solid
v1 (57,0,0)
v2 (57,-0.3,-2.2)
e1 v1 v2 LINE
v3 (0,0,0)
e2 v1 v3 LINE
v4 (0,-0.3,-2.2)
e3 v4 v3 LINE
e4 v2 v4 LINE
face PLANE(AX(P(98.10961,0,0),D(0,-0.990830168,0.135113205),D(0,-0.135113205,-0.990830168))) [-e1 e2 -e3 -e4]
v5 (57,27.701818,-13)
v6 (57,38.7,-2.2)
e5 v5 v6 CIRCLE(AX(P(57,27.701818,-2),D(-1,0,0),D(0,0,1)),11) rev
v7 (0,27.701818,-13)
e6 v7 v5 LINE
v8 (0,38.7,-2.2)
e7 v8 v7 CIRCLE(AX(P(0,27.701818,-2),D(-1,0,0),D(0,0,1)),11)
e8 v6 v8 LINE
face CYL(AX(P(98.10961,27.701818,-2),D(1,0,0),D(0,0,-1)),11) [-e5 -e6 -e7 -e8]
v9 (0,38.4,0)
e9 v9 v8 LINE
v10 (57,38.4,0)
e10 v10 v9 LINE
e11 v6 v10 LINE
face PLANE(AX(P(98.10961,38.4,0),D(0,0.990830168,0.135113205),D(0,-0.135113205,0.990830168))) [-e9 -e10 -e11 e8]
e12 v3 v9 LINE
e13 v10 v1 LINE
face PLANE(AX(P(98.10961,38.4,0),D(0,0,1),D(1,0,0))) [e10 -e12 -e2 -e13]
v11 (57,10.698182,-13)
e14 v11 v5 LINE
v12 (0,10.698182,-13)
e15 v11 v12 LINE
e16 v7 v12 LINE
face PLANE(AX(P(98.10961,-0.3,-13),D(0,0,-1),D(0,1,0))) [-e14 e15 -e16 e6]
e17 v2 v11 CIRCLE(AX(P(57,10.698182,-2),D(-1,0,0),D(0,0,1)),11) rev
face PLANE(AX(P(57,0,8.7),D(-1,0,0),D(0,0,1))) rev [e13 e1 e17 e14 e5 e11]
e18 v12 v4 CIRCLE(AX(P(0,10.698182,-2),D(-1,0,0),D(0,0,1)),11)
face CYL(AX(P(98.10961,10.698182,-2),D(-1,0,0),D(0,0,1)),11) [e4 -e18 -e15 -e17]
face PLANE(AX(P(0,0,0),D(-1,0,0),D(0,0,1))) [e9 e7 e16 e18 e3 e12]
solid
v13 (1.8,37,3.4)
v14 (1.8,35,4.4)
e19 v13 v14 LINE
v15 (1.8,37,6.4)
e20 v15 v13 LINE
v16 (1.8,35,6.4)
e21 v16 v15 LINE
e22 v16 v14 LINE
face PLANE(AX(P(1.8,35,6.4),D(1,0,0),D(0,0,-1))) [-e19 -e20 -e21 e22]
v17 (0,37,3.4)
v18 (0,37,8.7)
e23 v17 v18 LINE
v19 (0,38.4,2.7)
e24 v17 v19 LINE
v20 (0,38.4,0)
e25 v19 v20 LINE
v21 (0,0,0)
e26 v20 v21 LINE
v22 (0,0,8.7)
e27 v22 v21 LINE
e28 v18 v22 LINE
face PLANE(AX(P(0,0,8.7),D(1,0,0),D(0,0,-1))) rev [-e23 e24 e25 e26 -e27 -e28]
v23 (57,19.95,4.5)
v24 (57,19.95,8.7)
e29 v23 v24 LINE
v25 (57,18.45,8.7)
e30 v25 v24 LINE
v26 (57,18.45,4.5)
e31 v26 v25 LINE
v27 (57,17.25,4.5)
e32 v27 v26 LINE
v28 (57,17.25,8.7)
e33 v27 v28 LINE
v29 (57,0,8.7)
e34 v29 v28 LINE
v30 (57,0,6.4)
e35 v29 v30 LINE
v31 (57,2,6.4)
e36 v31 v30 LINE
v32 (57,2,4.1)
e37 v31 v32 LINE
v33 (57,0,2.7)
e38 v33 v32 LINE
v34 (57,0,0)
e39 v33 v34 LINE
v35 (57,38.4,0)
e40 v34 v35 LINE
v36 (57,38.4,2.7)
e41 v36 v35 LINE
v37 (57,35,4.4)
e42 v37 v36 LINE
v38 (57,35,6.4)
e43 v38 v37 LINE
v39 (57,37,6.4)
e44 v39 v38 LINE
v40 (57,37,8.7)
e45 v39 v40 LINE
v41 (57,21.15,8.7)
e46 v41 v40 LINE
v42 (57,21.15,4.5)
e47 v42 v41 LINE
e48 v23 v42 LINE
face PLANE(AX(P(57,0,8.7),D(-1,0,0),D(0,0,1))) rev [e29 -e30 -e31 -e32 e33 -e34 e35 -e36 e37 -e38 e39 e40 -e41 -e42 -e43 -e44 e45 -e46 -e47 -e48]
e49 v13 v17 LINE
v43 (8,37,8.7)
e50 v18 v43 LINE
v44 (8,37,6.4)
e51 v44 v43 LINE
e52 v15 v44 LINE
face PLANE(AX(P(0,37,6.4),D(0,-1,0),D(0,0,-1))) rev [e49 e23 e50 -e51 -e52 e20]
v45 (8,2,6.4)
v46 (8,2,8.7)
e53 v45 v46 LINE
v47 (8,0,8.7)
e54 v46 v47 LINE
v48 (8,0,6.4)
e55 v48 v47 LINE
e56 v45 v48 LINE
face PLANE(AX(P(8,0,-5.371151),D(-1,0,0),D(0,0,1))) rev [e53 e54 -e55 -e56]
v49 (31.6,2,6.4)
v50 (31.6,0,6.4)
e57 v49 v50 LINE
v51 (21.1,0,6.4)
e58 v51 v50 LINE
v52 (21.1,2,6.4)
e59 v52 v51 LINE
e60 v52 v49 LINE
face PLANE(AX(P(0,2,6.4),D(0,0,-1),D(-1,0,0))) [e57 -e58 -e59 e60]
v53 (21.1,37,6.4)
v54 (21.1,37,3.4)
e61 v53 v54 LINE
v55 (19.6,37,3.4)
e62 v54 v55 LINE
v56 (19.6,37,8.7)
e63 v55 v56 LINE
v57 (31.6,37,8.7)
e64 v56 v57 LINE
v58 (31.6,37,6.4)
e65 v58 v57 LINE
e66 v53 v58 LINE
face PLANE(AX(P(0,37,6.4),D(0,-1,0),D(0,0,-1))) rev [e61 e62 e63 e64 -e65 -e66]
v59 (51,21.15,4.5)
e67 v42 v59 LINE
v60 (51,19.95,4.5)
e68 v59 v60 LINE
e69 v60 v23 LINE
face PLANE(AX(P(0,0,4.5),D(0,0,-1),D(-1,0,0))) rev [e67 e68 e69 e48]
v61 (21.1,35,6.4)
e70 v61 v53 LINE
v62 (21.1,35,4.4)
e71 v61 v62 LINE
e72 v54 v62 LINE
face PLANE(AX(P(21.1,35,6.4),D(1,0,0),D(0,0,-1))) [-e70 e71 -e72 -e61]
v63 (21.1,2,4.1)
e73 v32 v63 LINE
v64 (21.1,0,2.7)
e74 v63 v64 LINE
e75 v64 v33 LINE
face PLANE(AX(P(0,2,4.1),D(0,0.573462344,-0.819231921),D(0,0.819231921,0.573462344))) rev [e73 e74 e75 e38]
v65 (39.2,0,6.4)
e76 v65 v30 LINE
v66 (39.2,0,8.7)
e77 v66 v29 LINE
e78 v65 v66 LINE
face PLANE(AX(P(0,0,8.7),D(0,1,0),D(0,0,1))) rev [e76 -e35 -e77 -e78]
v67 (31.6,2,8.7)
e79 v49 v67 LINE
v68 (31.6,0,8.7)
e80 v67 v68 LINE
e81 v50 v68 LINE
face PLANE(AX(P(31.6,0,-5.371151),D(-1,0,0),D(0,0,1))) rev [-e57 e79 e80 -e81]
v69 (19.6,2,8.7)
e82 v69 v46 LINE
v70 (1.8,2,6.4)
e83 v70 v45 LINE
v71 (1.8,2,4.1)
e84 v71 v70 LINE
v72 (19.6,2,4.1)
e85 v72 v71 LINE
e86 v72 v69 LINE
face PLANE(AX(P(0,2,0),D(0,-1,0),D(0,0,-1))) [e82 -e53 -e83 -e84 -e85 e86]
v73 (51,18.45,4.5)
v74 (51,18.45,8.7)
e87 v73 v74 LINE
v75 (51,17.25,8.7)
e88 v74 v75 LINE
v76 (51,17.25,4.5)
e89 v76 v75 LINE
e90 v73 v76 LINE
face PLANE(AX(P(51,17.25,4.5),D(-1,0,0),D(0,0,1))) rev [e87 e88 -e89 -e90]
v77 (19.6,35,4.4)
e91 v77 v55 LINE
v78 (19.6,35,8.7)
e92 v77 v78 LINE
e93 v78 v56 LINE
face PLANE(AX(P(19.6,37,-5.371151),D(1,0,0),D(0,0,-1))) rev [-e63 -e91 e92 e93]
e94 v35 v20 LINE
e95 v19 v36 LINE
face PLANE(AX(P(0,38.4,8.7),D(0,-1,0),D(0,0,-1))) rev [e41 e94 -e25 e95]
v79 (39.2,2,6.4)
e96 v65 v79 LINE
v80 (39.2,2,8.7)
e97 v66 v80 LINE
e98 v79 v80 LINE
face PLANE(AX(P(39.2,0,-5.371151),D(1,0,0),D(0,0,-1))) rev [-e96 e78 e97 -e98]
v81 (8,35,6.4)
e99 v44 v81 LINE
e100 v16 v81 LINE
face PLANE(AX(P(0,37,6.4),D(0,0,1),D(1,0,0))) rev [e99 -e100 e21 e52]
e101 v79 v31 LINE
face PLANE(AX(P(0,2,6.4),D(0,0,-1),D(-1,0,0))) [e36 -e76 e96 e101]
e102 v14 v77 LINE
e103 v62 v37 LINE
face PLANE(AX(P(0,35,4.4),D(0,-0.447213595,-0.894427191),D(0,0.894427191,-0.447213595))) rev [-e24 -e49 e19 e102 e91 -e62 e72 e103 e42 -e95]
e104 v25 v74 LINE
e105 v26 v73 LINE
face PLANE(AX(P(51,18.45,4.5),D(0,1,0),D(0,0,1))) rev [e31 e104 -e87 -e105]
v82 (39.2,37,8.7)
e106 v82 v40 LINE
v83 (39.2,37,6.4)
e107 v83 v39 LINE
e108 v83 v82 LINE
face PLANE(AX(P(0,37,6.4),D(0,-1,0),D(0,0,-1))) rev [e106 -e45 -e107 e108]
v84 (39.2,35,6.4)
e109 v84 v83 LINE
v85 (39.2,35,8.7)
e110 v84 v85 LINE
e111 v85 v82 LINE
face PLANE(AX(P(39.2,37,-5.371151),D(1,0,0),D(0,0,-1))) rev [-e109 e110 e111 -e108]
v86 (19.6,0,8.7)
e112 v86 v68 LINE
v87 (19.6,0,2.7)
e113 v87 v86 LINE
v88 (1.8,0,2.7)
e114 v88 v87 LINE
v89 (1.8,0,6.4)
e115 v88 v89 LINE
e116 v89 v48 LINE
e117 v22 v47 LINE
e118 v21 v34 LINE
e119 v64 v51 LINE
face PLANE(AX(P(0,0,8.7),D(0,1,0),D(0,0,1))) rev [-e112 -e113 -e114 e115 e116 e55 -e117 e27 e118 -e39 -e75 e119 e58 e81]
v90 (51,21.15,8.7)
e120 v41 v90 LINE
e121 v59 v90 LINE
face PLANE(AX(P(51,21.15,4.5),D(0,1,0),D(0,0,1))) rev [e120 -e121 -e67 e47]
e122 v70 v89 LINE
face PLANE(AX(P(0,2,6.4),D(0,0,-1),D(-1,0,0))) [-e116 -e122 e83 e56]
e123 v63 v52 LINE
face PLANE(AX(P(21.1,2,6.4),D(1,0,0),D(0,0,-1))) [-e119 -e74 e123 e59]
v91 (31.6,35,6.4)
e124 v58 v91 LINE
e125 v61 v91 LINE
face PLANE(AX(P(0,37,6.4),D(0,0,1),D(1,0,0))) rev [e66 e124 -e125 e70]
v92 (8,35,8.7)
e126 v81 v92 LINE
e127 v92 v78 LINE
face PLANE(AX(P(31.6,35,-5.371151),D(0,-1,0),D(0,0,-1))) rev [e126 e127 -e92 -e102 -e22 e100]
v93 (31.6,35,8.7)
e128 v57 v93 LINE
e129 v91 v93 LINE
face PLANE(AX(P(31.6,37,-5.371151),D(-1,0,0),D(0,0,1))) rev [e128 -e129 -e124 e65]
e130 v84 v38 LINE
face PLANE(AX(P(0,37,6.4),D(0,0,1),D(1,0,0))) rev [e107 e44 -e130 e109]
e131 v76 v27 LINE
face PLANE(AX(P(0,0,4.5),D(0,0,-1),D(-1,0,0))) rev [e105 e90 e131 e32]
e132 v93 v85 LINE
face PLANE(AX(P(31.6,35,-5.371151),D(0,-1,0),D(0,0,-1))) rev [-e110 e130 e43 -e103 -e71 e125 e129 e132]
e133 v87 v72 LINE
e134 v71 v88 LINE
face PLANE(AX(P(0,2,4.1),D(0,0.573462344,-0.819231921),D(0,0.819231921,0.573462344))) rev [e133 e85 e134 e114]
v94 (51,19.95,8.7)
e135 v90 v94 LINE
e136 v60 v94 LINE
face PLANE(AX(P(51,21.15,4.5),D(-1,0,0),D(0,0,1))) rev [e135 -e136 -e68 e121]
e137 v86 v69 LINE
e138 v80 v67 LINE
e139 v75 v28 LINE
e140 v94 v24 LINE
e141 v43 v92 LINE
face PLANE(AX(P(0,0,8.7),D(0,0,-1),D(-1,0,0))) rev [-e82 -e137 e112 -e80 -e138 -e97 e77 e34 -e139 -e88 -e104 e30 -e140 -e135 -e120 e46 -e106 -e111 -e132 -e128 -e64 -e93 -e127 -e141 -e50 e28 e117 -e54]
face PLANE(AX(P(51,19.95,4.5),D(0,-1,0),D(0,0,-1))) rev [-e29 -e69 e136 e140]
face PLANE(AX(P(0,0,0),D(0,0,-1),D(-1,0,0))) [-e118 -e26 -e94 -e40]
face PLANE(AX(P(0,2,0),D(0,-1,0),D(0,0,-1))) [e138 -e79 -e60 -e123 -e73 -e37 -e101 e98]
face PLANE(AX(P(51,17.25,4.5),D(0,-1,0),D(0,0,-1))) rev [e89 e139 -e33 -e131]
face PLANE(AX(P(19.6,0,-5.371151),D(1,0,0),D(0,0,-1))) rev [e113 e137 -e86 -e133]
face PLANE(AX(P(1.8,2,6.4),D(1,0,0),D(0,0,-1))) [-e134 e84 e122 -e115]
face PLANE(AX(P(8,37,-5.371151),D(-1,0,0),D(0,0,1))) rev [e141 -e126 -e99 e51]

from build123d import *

# Parameters (mm, degrees)
SKETCH_1_W          = 57
SKETCH_1_H          = 38.4
EXTRUDE_1_DEPTH     = 8.7
SKETCH_2_W          = 57
SKETCH_2_H          = 1.4
CUT_EXTRUDE_1_DEPTH = 2.3
SKETCH_3_W          = 57
SKETCH_3_H          = 2.3
CUT_EXTRUDE_2_DEPTH = 2
SKETCH_4_W          = 11.6
SKETCH_4_H          = 2
SKETCH_4_W_2        = 7.6
CUT_EXTRUDE_3_DEPTH = 2.3
CUT_EXTRUDE_4_DEPTH = 70.276619433
SKETCH_6_W          = 1.5
SKETCH_6_H          = 3.7
SKETCH_6_W_2        = 1.8
EXTRUDE_2_DEPTH     = 2
SKETCH_7_W          = 1.8
SKETCH_7_H          = 3.7
SKETCH_7_W_2        = 1.5
EXTRUDE_3_DEPTH     = 2
SKETCH_10_W         = 6
SKETCH_10_H         = 1.2
CUT_EXTRUDE_5_DEPTH = 4.2
EXTRUDE_4_DEPTH     = 57
FILLET_1_R          = 11


with BuildPart() as part:
    # Эскиз1 → Бобышка-Вытянуть1 (new body)
    with BuildSketch(Plane.XY):
        with Locations((28.5, 19.2)):
            Rectangle(SKETCH_1_W, SKETCH_1_H)
    extrude(amount=EXTRUDE_1_DEPTH)

    # Эскиз2 → Вырез-Вытянуть1 (cut)
    with BuildSketch(Plane.XY.offset(8.7)):
        with Locations((28.5, 37.7)):
            Rectangle(SKETCH_2_W, SKETCH_2_H)
    extrude(amount=-CUT_EXTRUDE_1_DEPTH, mode=Mode.SUBTRACT)

    # Эскиз3 → Вырез-Вытянуть2 (cut)
    with BuildSketch(Plane(origin=(0, 0, 0), x_dir=(1, 0, 0), z_dir=(0, 1, 0))):
        with Locations((28.5, -5.25)):
            Rectangle(SKETCH_3_W, SKETCH_3_H)
    extrude(amount=CUT_EXTRUDE_2_DEPTH, mode=Mode.SUBTRACT)

    # Эскиз4 → Вырез-Вытянуть3 (cut)
    with BuildSketch(Plane.XY.offset(8.7)):
        with Locations((13.8, 1)):
            Rectangle(SKETCH_4_W, SKETCH_4_H)
        with Locations((35.4, 1)):
            Rectangle(SKETCH_4_W_2, SKETCH_4_H)
        with Locations((35.4, 36)):
            Rectangle(SKETCH_4_W_2, SKETCH_4_H)
        with Locations((13.8, 36)):
            Rectangle(SKETCH_4_W, SKETCH_4_H)
    extrude(amount=-CUT_EXTRUDE_3_DEPTH, mode=Mode.SUBTRACT)

    # Эскиз5 → Вырез-Вытянуть4 (cut, through all)
    with BuildSketch(Plane(origin=(57, 0, 0), x_dir=(0, 0, -1), z_dir=(1, 0, 0))):
        Polygon((-4.1, 0), (-4.1, 2), (-2.7, 0), align=None)
        Polygon((-4.4, 35), (-2.7, 38.4), (-6.4, 38.4), (-6.4, 37), (-6.4, 35), align=None)
    extrude(amount=-CUT_EXTRUDE_4_DEPTH, mode=Mode.SUBTRACT)

    # Эскиз6 → Бобышка-Вытянуть2 (add)
    with BuildSketch(Plane.XZ):
        with Locations((20.35, 4.55)):
            Rectangle(SKETCH_6_W, SKETCH_6_H)
        with Locations((0.9, 4.55)):
            Rectangle(SKETCH_6_W_2, SKETCH_6_H)
    extrude(amount=-EXTRUDE_2_DEPTH)

    # Эскиз7 → Бобышка-Вытянуть3 (add)
    with BuildSketch(Plane(origin=(0, 37, 0), x_dir=(1, 0, 0), z_dir=(0, 1, 0))):
        with Locations((0.9, -4.55)):
            Rectangle(SKETCH_7_W, SKETCH_7_H)
        with Locations((20.35, -4.55)):
            Rectangle(SKETCH_7_W_2, SKETCH_7_H)
    extrude(amount=-EXTRUDE_3_DEPTH)

    # Эскиз10 → Вырез-Вытянуть5 (cut)
    with BuildSketch(Plane.XY.offset(8.7)):
        with Locations((54, 20.55)):
            Rectangle(SKETCH_10_W, SKETCH_10_H)
        with Locations((54, 17.85)):
            Rectangle(SKETCH_10_W, SKETCH_10_H)
    extrude(amount=-CUT_EXTRUDE_5_DEPTH, mode=Mode.SUBTRACT)


with BuildPart() as body_2:
    # Эскиз11 → Бобышка-Вытянуть4 (new body)
    with BuildSketch(Plane.ZY):
        Polygon((0, 0), (-2.2, -0.3), (-13, -0.3), (-13, 38.7), (-2.2, 38.7), (0, 38.4), align=None)
    extrude(amount=-EXTRUDE_4_DEPTH)

    # Скругление1
    # the kernel refuses this fillet: 11 mm, written as the material it takes off along each edge
    with BuildSketch(Plane(origin=(-27.49545417, 38.7, -13), x_dir=(0, -1, 0), z_dir=(1, 0, 0))) as fillet_1_piece_1:
        with BuildLine():
            CenterArc((10.998181668, -11), FILLET_1_R, 90, 88.95820115)
            Line((0, -10.8), (-0.219963633, -10.796))
            ThreePointArc((-0.219963633, -10.796), (-0.22, -5.4), (-0.22, 0))
            Line((-0.22, 0), (0, 0.22))
            Line((0, 0.22), (10.998181668, 0.22))
            Line((10.998181668, 0.22), (10.998181668, 0))
        make_face()
    extrude(amount=111.990908339, mode=Mode.SUBTRACT)
    with BuildSketch(Plane(origin=(-27.49545417, -0.3, -13), x_dir=(0, 0, 1), z_dir=(1, 0, 0))) as fillet_1_piece_2:
        with BuildLine():
            CenterArc((11, -10.998181668), FILLET_1_R, 91.04179885, 88.95820115)
            Line((0, -10.998181668), (-0.22, -10.998181668))
            Line((-0.22, -10.998181668), (-0.22, 0))
            Line((-0.22, 0), (0, 0.22))
            ThreePointArc((0, 0.22), (5.4, 0.22), (10.796, 0.219963633))
            Line((10.796, 0.219963633), (10.8, 0))
        make_face()
    extrude(amount=111.990908339, mode=Mode.SUBTRACT)


solid = Compound([part.part, body_2.part])
